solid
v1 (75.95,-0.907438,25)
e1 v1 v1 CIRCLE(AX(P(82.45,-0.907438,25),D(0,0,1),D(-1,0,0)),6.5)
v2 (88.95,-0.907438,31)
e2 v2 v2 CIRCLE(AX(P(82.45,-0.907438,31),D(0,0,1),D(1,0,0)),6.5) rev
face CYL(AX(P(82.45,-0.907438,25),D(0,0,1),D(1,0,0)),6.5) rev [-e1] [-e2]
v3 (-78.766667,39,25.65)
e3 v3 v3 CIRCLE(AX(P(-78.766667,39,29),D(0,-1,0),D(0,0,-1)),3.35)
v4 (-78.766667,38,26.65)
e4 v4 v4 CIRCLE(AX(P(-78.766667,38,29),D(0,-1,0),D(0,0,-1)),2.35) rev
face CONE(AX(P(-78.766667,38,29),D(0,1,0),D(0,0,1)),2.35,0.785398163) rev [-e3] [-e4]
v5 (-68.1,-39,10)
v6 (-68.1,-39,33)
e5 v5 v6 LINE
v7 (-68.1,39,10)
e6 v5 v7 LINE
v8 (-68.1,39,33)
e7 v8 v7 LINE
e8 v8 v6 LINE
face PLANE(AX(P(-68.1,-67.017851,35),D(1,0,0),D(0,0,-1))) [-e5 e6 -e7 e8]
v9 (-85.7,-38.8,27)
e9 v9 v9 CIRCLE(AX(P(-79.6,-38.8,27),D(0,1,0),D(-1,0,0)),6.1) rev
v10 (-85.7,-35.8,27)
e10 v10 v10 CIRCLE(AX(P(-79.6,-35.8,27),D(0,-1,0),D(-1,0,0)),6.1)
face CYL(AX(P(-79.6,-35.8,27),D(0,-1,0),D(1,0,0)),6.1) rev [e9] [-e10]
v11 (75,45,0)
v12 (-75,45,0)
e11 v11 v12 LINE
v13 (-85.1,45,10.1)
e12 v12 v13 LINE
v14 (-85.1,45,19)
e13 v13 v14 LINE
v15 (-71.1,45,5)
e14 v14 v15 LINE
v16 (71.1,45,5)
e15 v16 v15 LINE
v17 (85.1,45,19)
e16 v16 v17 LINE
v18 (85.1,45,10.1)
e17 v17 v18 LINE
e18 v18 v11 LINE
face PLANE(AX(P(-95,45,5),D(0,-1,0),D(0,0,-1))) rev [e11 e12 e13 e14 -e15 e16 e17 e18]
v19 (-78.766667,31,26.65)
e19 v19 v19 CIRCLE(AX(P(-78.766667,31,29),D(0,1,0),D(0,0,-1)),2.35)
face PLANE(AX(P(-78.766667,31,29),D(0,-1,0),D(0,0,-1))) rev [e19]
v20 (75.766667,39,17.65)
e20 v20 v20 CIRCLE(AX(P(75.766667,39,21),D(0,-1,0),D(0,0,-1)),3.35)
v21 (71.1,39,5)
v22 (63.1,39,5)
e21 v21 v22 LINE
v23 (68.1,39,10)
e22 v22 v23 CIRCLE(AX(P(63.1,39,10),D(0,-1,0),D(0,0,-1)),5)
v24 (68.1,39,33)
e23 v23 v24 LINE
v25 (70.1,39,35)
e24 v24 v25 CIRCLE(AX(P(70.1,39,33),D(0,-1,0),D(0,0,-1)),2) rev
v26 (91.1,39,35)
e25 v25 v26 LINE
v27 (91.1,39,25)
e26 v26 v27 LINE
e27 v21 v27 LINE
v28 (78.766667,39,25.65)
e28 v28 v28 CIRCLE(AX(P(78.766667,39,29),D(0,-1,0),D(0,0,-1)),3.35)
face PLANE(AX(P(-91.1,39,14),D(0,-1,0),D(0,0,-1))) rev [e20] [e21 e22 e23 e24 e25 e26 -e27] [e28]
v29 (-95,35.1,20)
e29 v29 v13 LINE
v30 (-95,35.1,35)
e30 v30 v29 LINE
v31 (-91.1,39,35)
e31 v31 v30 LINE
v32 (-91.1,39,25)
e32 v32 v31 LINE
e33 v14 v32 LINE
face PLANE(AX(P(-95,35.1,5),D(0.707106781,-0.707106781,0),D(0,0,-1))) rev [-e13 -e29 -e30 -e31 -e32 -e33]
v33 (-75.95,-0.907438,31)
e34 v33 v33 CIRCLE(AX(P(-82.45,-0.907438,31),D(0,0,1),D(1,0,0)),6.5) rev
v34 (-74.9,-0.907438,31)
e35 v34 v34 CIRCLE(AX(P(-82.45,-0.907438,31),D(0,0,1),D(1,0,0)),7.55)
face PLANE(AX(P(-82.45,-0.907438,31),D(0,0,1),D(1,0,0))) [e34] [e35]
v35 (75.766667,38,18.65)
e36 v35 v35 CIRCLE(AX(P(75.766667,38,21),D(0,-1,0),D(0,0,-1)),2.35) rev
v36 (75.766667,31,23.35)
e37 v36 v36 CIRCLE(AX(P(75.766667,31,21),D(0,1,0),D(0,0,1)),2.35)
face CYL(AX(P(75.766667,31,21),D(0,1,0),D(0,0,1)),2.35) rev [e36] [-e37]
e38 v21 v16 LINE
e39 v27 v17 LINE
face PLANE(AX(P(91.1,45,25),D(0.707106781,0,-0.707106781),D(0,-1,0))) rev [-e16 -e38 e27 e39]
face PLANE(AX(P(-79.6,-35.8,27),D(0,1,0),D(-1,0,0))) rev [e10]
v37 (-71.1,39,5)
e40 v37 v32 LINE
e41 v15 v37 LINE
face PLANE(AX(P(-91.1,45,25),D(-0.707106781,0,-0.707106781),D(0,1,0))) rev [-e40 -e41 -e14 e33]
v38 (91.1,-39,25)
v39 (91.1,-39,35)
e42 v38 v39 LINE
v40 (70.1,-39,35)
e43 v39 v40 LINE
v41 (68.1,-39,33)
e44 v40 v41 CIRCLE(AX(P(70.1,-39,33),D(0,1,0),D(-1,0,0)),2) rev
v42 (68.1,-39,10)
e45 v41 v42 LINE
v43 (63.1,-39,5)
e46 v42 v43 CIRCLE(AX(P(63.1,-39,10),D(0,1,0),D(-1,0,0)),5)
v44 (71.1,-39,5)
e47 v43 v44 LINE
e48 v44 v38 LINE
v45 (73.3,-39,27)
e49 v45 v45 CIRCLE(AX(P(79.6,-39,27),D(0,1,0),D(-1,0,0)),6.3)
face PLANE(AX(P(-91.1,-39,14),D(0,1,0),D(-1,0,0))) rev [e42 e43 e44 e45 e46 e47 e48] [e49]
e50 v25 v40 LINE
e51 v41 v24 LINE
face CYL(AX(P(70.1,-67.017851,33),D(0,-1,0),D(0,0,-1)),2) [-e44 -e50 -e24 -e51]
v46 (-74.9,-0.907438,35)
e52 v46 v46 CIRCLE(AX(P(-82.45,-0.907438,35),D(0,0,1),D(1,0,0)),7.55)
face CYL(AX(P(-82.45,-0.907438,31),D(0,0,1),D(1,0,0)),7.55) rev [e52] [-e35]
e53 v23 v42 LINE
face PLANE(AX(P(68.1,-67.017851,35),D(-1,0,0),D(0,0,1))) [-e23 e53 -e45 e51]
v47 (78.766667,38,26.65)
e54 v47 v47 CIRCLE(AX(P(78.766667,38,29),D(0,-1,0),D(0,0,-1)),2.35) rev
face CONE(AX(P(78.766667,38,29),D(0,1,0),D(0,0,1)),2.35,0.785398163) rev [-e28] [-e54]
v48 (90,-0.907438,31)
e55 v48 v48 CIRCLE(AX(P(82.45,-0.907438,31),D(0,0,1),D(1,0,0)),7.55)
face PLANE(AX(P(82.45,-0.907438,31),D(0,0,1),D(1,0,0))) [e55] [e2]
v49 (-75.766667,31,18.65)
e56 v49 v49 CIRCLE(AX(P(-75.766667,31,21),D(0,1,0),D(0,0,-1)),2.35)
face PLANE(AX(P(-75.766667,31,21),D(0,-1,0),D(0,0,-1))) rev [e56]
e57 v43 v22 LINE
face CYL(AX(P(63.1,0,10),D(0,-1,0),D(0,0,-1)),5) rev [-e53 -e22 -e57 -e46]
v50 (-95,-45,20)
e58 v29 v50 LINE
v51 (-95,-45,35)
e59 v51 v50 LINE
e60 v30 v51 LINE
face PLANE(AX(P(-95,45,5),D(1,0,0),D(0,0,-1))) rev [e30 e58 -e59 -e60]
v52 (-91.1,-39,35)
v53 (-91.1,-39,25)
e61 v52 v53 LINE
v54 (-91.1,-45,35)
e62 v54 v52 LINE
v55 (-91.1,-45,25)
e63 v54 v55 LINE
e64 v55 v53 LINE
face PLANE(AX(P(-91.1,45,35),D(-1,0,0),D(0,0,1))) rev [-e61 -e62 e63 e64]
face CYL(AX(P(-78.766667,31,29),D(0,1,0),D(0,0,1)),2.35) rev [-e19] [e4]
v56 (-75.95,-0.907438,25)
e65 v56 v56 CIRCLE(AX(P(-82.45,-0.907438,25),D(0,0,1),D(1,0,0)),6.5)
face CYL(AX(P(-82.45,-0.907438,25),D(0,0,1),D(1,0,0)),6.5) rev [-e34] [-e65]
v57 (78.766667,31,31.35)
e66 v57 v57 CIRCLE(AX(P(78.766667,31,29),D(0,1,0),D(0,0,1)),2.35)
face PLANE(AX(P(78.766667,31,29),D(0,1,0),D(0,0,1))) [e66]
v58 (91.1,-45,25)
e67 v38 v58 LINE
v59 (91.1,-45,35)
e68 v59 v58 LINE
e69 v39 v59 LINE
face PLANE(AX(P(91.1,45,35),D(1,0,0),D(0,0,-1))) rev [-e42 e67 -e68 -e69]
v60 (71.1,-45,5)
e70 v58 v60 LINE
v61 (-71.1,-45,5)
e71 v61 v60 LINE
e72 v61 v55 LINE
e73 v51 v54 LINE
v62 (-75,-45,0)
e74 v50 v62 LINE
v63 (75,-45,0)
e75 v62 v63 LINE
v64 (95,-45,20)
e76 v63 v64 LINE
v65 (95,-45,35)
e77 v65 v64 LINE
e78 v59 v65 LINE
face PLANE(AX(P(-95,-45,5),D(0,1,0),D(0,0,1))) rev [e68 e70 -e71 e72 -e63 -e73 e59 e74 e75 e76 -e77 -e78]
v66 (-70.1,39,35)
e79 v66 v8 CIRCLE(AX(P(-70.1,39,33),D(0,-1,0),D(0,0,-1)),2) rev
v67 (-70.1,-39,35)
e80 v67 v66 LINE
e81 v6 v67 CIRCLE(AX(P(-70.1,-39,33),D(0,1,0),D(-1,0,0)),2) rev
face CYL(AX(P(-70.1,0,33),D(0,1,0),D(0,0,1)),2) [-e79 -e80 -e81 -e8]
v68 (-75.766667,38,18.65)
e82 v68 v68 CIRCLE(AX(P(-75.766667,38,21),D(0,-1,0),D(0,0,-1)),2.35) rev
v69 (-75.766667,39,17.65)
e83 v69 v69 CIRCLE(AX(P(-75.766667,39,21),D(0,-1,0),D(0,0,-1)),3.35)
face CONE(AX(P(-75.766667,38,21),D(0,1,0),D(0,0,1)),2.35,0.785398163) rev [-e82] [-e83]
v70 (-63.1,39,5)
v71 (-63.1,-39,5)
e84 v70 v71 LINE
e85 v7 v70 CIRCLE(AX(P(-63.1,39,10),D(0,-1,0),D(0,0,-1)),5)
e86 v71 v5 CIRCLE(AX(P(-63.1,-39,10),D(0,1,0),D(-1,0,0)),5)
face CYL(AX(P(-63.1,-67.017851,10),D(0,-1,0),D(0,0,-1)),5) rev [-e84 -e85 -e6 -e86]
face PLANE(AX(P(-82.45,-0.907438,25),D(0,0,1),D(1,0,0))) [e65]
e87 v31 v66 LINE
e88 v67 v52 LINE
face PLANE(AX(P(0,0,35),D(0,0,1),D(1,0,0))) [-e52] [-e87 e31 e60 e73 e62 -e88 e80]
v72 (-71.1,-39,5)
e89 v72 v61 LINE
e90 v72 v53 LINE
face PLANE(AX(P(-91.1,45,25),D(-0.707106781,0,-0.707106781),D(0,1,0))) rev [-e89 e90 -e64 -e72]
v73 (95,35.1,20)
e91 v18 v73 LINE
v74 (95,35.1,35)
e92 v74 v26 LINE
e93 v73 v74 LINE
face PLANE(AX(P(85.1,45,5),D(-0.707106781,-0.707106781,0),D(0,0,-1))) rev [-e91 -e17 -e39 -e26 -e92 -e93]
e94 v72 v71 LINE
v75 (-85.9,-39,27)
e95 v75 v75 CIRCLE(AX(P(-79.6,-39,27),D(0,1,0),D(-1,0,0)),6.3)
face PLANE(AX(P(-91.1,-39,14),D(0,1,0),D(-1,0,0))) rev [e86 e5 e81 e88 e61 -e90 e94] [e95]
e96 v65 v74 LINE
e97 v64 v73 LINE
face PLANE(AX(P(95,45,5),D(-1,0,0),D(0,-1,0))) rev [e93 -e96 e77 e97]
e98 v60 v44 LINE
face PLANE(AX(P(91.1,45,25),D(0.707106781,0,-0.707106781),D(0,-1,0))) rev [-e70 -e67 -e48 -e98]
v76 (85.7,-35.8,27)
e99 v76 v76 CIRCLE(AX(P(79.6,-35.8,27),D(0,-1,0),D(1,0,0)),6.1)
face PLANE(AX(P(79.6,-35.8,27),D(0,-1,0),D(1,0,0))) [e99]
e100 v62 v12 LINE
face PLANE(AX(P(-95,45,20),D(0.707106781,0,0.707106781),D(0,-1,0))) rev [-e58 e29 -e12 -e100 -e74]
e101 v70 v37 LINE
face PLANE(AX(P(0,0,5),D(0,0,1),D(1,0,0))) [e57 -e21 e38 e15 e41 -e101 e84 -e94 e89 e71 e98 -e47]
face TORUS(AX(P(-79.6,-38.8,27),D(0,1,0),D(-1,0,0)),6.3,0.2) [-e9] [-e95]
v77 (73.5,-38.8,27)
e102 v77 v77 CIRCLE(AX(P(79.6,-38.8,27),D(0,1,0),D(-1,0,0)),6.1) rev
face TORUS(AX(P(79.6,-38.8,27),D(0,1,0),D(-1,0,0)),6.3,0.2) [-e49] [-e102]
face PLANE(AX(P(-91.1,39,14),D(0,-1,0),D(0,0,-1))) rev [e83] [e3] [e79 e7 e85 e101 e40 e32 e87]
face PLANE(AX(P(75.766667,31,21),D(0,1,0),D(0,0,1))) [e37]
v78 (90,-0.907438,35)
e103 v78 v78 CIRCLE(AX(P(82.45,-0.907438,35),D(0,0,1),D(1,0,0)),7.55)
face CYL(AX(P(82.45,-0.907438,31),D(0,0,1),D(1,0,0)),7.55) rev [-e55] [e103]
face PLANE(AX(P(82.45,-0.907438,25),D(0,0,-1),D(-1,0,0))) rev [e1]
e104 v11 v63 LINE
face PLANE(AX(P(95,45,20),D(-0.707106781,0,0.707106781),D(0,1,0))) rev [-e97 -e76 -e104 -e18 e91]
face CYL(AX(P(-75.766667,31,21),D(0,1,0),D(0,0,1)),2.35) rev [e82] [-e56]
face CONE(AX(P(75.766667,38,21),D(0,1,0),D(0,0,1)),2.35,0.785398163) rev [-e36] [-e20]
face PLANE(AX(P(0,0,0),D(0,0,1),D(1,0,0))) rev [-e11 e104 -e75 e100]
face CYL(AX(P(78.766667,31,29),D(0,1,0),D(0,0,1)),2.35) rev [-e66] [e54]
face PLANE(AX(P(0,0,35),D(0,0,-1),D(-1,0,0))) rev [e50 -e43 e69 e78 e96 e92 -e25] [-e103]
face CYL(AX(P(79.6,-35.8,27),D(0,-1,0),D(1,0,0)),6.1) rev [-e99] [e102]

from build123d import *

# Parameters (mm, degrees)
SKETCH1_W                      = 190
SKETCH1_H                      = 90
BOSS_EXTRUDE1_DEPTH            = 5
SKETCH2_W                      = 3.9
SKETCH2_H                      = 90
BOSS_EXTRUDE2_DEPTH            = 30
SKETCH3_W                      = 34
SKETCH3_H                      = 5
SKETCH3_W_2                    = 47
BOSS_EXTRUDE3_DEPTH            = 90
SKETCH4_W                      = 182.2
SKETCH4_H                      = 6
CUT_EXTRUDE1_DEPTH             = 5
CHAMFER6_SIZE                  = 20
BOSS_EXTRUDE4_DEPTH            = 78
FILLET5_R                      = 2
SKETCH9_R                      = 6.5
CUT_EXTRUDE4_DEPTH             = 10
SKETCH10_R                     = 7.55
CUT_EXTRUDE5_DEPTH             = 4
SKETCH15_R                     = 2.35
CUT_EXTRUDE7_DEPTH             = 8
CHAMFER7_SIZE                  = 1
SKETCH17_R                     = 6.1
CUT_EXTRUDE8_DEPTH             = 3.2
FILLET7_R                      = 0.2
CHAMFER8_SIZE                  = 9.9
CUT_EXTRUDE9_REACH             = 164.433
SKETCH18_W                     = 5
SKETCH18_H                     = 78
CUT_EXTRUDE9_DIRECTION_2_REACH = 164.433
BOSS_EXTRUDE5_DEPTH            = 78
FILLET8_R                      = 5


with BuildPart() as part:
    # Sketch1 → Boss-Extrude1 (new body)
    with BuildSketch(Plane.XY):
        Rectangle(SKETCH1_W, SKETCH1_H)
    extrude(amount=BOSS_EXTRUDE1_DEPTH)

    # Sketch2 → Boss-Extrude2 (add)
    with BuildSketch(Plane.XY.offset(5)):
        with Locations((-93.05, 0)):
            Rectangle(SKETCH2_W, SKETCH2_H)
        with Locations((93.05, 0)):
            Rectangle(SKETCH2_W, SKETCH2_H)
    extrude(amount=BOSS_EXTRUDE2_DEPTH)

    # Sketch3 → Boss-Extrude3 (add)
    with BuildSketch(Plane(origin=(0, 45, 0), x_dir=(1, 0, 0), z_dir=(0, 1, 0))):
        with Locations((-74.1, -16.5)):
            Rectangle(SKETCH3_W, SKETCH3_H)
        with Locations((67.6, -16.5)):
            Rectangle(SKETCH3_W_2, SKETCH3_H)
    extrude(amount=-BOSS_EXTRUDE3_DEPTH)

    # Sketch4 → Cut-Extrude1 (cut)
    with BuildSketch(Plane.XY.offset(19)):
        with Locations((0, 42)):
            Rectangle(SKETCH4_W, SKETCH4_H)
        with Locations((0, -42)):
            Rectangle(SKETCH4_W, SKETCH4_H)
    extrude(amount=-CUT_EXTRUDE1_DEPTH, mode=Mode.SUBTRACT)

    # Chamfer6
    # the kernel refuses this chamfer: 20 mm, written as the material it adds along each edge
    with BuildSketch(Plane(origin=(-91.1, 45, 5), x_dir=(0.9996219169112968, 0, -0.02749587661058636), z_dir=(0, -1, 0))) as chamfer6_piece_1:
        Polygon((CHAMFER6_SIZE * 0.999621916911, CHAMFER6_SIZE * 0.0274958766106), (-CHAMFER6_SIZE * 0.0274958766106, CHAMFER6_SIZE * 0.999621916911), (0, 0), align=None)
    extrude(amount=90)
    with BuildSketch(Plane(origin=(91.1, -45, 5), x_dir=(0.027495876610586317, 0, 0.9996219169112968), z_dir=(0, 1, 0))) as chamfer6_piece_2:
        Polygon((CHAMFER6_SIZE * 0.999621916911, -CHAMFER6_SIZE * 0.0274958766106), (-CHAMFER6_SIZE * 0.0274958766106, -CHAMFER6_SIZE * 0.999621916911), (0, 0), align=None)
    extrude(amount=90)
    # the kernel refuses this chamfer: 20 mm, written as the material it takes off along each edge
    with BuildSketch(Plane(origin=(-95, -96.433659759, 0), x_dir=(0.9996219169112968, 0, -0.027495876610586372), z_dir=(0, 1, 0)), Plane(origin=(95, 96.433659759, 0), x_dir=(-0.9996219169112968, 0, -0.027495876610586372), z_dir=(0, -1, 0))) as chamfer6_2_piece_1:
        Polygon((CHAMFER6_SIZE * 0.999621916911, -CHAMFER6_SIZE * 0.0274958766106), (-CHAMFER6_SIZE * 0.0274958766106, -CHAMFER6_SIZE * 0.999621916911), (0, 0), align=None)
    extrude(amount=192.867319519, mode=Mode.SUBTRACT)

    # Sketch7 → Boss-Extrude4 (add)
    with BuildSketch(Plane(origin=(0, 39, 0), x_dir=(1, 0, 0), z_dir=(0, 1, 0))):
        Polygon((-85.1, -19), (-91.1, -25), (-91.1, -35), (-68.1, -35), (-68.1, -19), align=None)
        Polygon((68.1, -35), (68.1, -19), (85.1, -19), (91.1, -25), (91.1, -35), align=None)
    extrude(amount=-BOSS_EXTRUDE4_DEPTH)

    # Fillet5
    fillet5_edges = [part.edges().sort_by_distance(p)[0] for p in [
        (-68.1, 0, 35),
        (68.1, 0, 35),
    ]]
    fillet(fillet5_edges, radius=FILLET5_R)

    # Sketch9 → Cut-Extrude4 (cut)
    with BuildSketch(Plane.XY.offset(35)):
        with Locations((-82.45, -0.90743758)):
            Circle(SKETCH9_R)
        with Locations(Location((82.45, -0.90743758, 0), (0, 0, 180))):
            Circle(SKETCH9_R)
    extrude(amount=-CUT_EXTRUDE4_DEPTH, mode=Mode.SUBTRACT)

    # Sketch10 → Cut-Extrude5 (cut)
    with BuildSketch(Plane.XY.offset(35)):
        with Locations((-82.45, -0.90743758)):
            Circle(SKETCH10_R)
        with Locations((82.45, -0.90743758)):
            Circle(SKETCH10_R)
    extrude(amount=-CUT_EXTRUDE5_DEPTH, mode=Mode.SUBTRACT)

    # Sketch15 → Cut-Extrude7 (cut)
    with BuildSketch(Plane(origin=(0, 39, 0), x_dir=(1, 0, 0), z_dir=(0, 1, 0))):
        with Locations(Location((75.766666667, -21, 0), (0, 0, 270))):
            Circle(SKETCH15_R)
        with Locations(Location((-75.766666667, -21, 0), (0, 0, 90))):
            Circle(SKETCH15_R)
        with Locations(Location((78.766666667, -29, 0), (0, 0, 270))):
            Circle(SKETCH15_R)
        with Locations(Location((-78.766666667, -29, 0), (0, 0, 90))):
            Circle(SKETCH15_R)
    extrude(amount=-CUT_EXTRUDE7_DEPTH, mode=Mode.SUBTRACT)

    # Chamfer7
    chamfer7_edges = [part.edges().sort_by_distance(p)[0] for p in [
        (-75.766666667, 39, 23.35),
        (78.766666667, 39, 26.65),
        (-78.766666667, 39, 31.35),
        (75.766666667, 39, 18.65),
    ]]
    chamfer(chamfer7_edges, length=CHAMFER7_SIZE)

    # Sketch17 → Cut-Extrude8 (cut)
    with BuildSketch(Plane.XZ.offset(39)):
        with Locations((79.6, 27)):
            Circle(SKETCH17_R)
        with Locations(Location((-79.6, 27, 0), (0, 0, 180))):
            Circle(SKETCH17_R)
    extrude(amount=-CUT_EXTRUDE8_DEPTH, mode=Mode.SUBTRACT)

    # Fillet7
    fillet7_edges = [part.edges().sort_by_distance(p)[0] for p in [
        (73.5, -39, 27),
        (-73.5, -39, 27),
    ]]
    fillet(fillet7_edges, radius=FILLET7_R)

    # Chamfer8
    # the kernel refuses this chamfer: 9.9 mm, written as the material it takes off along each edge
    with BuildSketch(Plane(origin=(-95, 45, -5.459661581), x_dir=(0.9996219169112968, 0.027495876610586265, 0), z_dir=(0, 0, 1)), Plane(origin=(95, 45, 60.459661581), x_dir=(-0.9996219169112968, 0.02749587661058615, 0), z_dir=(0, 0, -1))) as chamfer8_piece_1:
        Polygon((CHAMFER8_SIZE * 0.999621916911, -CHAMFER8_SIZE * 0.0274958766106), (-CHAMFER8_SIZE * 0.0274958766106, -CHAMFER8_SIZE * 0.999621916911), (0, 0), align=None)
    extrude(amount=65.919323162, mode=Mode.SUBTRACT)

    # Cut-Extrude9: up to this face of the body (flat: up to its plane)
    cut_extrude9_end = Plane(part.part.faces().sort_by_distance((-68.1, 0, 26))[0])
    # Sketch18 → Cut-Extrude9 (cut, up to the picked face)
    with BuildSketch(Plane(origin=(-57.1, 0, 0), x_dir=(0, 0, -1), z_dir=(1, 0, 0)), mode=Mode.PRIVATE) as cut_extrude9_sk1:
        with Locations((-16.5, 0)):
            Rectangle(SKETCH18_W, SKETCH18_H)
    cut_extrude9_tool1 = split(extrude(cut_extrude9_sk1.sketch, amount=-CUT_EXTRUDE9_REACH, mode=Mode.PRIVATE), bisect_by=cut_extrude9_end, keep=Keep.BOTH, mode=Mode.PRIVATE)
    add(cut_extrude9_tool1.solids().sort_by(Axis((-57.1, 0, 16.5), (-1, 0, 0)))[0], mode=Mode.SUBTRACT)

    # Cut-Extrude9 direction 2: up to this face of the body (flat: up to its plane)
    cut_extrude9_direction_2_end = Plane(part.part.faces().sort_by_distance((68.1, 0, 26))[0])
    # Sketch18 → Cut-Extrude9 direction 2 (cut, up to the picked face)
    with BuildSketch(Plane(origin=(-57.1, 0, 0), x_dir=(0, 0, -1), z_dir=(1, 0, 0)), mode=Mode.PRIVATE) as cut_extrude9_direction_2_sk1:
        with Locations((-16.5, 0)):
            Rectangle(SKETCH18_W, SKETCH18_H)
    cut_extrude9_direction_2_tool1 = split(extrude(cut_extrude9_direction_2_sk1.sketch, amount=CUT_EXTRUDE9_DIRECTION_2_REACH, mode=Mode.PRIVATE), bisect_by=cut_extrude9_direction_2_end, keep=Keep.BOTH, mode=Mode.PRIVATE)
    add(cut_extrude9_direction_2_tool1.solids().sort_by(Axis((-57.1, 0, 16.5), (1, 0, 0)))[0], mode=Mode.SUBTRACT)

    # Sketch20 → Boss-Extrude5 (add)
    with BuildSketch(Plane(origin=(0, 39, 0), x_dir=(1, 0, 0), z_dir=(0, 1, 0))):
        Polygon((-68.1, -14), (-68.1, -5), (-71.1, -5), (-80.1, -14), align=None)
        Polygon((71.1, -5), (80.1, -14), (68.1, -14), (68.1, -5), align=None)
    extrude(amount=-BOSS_EXTRUDE5_DEPTH)

    # Fillet8
    fillet8_edges = [part.edges().sort_by_distance(p)[0] for p in [
        (-68.1, 0, 5),
        (68.1, 0, 5),
    ]]
    fillet(fillet8_edges, radius=FILLET8_R)


solid = part.part
